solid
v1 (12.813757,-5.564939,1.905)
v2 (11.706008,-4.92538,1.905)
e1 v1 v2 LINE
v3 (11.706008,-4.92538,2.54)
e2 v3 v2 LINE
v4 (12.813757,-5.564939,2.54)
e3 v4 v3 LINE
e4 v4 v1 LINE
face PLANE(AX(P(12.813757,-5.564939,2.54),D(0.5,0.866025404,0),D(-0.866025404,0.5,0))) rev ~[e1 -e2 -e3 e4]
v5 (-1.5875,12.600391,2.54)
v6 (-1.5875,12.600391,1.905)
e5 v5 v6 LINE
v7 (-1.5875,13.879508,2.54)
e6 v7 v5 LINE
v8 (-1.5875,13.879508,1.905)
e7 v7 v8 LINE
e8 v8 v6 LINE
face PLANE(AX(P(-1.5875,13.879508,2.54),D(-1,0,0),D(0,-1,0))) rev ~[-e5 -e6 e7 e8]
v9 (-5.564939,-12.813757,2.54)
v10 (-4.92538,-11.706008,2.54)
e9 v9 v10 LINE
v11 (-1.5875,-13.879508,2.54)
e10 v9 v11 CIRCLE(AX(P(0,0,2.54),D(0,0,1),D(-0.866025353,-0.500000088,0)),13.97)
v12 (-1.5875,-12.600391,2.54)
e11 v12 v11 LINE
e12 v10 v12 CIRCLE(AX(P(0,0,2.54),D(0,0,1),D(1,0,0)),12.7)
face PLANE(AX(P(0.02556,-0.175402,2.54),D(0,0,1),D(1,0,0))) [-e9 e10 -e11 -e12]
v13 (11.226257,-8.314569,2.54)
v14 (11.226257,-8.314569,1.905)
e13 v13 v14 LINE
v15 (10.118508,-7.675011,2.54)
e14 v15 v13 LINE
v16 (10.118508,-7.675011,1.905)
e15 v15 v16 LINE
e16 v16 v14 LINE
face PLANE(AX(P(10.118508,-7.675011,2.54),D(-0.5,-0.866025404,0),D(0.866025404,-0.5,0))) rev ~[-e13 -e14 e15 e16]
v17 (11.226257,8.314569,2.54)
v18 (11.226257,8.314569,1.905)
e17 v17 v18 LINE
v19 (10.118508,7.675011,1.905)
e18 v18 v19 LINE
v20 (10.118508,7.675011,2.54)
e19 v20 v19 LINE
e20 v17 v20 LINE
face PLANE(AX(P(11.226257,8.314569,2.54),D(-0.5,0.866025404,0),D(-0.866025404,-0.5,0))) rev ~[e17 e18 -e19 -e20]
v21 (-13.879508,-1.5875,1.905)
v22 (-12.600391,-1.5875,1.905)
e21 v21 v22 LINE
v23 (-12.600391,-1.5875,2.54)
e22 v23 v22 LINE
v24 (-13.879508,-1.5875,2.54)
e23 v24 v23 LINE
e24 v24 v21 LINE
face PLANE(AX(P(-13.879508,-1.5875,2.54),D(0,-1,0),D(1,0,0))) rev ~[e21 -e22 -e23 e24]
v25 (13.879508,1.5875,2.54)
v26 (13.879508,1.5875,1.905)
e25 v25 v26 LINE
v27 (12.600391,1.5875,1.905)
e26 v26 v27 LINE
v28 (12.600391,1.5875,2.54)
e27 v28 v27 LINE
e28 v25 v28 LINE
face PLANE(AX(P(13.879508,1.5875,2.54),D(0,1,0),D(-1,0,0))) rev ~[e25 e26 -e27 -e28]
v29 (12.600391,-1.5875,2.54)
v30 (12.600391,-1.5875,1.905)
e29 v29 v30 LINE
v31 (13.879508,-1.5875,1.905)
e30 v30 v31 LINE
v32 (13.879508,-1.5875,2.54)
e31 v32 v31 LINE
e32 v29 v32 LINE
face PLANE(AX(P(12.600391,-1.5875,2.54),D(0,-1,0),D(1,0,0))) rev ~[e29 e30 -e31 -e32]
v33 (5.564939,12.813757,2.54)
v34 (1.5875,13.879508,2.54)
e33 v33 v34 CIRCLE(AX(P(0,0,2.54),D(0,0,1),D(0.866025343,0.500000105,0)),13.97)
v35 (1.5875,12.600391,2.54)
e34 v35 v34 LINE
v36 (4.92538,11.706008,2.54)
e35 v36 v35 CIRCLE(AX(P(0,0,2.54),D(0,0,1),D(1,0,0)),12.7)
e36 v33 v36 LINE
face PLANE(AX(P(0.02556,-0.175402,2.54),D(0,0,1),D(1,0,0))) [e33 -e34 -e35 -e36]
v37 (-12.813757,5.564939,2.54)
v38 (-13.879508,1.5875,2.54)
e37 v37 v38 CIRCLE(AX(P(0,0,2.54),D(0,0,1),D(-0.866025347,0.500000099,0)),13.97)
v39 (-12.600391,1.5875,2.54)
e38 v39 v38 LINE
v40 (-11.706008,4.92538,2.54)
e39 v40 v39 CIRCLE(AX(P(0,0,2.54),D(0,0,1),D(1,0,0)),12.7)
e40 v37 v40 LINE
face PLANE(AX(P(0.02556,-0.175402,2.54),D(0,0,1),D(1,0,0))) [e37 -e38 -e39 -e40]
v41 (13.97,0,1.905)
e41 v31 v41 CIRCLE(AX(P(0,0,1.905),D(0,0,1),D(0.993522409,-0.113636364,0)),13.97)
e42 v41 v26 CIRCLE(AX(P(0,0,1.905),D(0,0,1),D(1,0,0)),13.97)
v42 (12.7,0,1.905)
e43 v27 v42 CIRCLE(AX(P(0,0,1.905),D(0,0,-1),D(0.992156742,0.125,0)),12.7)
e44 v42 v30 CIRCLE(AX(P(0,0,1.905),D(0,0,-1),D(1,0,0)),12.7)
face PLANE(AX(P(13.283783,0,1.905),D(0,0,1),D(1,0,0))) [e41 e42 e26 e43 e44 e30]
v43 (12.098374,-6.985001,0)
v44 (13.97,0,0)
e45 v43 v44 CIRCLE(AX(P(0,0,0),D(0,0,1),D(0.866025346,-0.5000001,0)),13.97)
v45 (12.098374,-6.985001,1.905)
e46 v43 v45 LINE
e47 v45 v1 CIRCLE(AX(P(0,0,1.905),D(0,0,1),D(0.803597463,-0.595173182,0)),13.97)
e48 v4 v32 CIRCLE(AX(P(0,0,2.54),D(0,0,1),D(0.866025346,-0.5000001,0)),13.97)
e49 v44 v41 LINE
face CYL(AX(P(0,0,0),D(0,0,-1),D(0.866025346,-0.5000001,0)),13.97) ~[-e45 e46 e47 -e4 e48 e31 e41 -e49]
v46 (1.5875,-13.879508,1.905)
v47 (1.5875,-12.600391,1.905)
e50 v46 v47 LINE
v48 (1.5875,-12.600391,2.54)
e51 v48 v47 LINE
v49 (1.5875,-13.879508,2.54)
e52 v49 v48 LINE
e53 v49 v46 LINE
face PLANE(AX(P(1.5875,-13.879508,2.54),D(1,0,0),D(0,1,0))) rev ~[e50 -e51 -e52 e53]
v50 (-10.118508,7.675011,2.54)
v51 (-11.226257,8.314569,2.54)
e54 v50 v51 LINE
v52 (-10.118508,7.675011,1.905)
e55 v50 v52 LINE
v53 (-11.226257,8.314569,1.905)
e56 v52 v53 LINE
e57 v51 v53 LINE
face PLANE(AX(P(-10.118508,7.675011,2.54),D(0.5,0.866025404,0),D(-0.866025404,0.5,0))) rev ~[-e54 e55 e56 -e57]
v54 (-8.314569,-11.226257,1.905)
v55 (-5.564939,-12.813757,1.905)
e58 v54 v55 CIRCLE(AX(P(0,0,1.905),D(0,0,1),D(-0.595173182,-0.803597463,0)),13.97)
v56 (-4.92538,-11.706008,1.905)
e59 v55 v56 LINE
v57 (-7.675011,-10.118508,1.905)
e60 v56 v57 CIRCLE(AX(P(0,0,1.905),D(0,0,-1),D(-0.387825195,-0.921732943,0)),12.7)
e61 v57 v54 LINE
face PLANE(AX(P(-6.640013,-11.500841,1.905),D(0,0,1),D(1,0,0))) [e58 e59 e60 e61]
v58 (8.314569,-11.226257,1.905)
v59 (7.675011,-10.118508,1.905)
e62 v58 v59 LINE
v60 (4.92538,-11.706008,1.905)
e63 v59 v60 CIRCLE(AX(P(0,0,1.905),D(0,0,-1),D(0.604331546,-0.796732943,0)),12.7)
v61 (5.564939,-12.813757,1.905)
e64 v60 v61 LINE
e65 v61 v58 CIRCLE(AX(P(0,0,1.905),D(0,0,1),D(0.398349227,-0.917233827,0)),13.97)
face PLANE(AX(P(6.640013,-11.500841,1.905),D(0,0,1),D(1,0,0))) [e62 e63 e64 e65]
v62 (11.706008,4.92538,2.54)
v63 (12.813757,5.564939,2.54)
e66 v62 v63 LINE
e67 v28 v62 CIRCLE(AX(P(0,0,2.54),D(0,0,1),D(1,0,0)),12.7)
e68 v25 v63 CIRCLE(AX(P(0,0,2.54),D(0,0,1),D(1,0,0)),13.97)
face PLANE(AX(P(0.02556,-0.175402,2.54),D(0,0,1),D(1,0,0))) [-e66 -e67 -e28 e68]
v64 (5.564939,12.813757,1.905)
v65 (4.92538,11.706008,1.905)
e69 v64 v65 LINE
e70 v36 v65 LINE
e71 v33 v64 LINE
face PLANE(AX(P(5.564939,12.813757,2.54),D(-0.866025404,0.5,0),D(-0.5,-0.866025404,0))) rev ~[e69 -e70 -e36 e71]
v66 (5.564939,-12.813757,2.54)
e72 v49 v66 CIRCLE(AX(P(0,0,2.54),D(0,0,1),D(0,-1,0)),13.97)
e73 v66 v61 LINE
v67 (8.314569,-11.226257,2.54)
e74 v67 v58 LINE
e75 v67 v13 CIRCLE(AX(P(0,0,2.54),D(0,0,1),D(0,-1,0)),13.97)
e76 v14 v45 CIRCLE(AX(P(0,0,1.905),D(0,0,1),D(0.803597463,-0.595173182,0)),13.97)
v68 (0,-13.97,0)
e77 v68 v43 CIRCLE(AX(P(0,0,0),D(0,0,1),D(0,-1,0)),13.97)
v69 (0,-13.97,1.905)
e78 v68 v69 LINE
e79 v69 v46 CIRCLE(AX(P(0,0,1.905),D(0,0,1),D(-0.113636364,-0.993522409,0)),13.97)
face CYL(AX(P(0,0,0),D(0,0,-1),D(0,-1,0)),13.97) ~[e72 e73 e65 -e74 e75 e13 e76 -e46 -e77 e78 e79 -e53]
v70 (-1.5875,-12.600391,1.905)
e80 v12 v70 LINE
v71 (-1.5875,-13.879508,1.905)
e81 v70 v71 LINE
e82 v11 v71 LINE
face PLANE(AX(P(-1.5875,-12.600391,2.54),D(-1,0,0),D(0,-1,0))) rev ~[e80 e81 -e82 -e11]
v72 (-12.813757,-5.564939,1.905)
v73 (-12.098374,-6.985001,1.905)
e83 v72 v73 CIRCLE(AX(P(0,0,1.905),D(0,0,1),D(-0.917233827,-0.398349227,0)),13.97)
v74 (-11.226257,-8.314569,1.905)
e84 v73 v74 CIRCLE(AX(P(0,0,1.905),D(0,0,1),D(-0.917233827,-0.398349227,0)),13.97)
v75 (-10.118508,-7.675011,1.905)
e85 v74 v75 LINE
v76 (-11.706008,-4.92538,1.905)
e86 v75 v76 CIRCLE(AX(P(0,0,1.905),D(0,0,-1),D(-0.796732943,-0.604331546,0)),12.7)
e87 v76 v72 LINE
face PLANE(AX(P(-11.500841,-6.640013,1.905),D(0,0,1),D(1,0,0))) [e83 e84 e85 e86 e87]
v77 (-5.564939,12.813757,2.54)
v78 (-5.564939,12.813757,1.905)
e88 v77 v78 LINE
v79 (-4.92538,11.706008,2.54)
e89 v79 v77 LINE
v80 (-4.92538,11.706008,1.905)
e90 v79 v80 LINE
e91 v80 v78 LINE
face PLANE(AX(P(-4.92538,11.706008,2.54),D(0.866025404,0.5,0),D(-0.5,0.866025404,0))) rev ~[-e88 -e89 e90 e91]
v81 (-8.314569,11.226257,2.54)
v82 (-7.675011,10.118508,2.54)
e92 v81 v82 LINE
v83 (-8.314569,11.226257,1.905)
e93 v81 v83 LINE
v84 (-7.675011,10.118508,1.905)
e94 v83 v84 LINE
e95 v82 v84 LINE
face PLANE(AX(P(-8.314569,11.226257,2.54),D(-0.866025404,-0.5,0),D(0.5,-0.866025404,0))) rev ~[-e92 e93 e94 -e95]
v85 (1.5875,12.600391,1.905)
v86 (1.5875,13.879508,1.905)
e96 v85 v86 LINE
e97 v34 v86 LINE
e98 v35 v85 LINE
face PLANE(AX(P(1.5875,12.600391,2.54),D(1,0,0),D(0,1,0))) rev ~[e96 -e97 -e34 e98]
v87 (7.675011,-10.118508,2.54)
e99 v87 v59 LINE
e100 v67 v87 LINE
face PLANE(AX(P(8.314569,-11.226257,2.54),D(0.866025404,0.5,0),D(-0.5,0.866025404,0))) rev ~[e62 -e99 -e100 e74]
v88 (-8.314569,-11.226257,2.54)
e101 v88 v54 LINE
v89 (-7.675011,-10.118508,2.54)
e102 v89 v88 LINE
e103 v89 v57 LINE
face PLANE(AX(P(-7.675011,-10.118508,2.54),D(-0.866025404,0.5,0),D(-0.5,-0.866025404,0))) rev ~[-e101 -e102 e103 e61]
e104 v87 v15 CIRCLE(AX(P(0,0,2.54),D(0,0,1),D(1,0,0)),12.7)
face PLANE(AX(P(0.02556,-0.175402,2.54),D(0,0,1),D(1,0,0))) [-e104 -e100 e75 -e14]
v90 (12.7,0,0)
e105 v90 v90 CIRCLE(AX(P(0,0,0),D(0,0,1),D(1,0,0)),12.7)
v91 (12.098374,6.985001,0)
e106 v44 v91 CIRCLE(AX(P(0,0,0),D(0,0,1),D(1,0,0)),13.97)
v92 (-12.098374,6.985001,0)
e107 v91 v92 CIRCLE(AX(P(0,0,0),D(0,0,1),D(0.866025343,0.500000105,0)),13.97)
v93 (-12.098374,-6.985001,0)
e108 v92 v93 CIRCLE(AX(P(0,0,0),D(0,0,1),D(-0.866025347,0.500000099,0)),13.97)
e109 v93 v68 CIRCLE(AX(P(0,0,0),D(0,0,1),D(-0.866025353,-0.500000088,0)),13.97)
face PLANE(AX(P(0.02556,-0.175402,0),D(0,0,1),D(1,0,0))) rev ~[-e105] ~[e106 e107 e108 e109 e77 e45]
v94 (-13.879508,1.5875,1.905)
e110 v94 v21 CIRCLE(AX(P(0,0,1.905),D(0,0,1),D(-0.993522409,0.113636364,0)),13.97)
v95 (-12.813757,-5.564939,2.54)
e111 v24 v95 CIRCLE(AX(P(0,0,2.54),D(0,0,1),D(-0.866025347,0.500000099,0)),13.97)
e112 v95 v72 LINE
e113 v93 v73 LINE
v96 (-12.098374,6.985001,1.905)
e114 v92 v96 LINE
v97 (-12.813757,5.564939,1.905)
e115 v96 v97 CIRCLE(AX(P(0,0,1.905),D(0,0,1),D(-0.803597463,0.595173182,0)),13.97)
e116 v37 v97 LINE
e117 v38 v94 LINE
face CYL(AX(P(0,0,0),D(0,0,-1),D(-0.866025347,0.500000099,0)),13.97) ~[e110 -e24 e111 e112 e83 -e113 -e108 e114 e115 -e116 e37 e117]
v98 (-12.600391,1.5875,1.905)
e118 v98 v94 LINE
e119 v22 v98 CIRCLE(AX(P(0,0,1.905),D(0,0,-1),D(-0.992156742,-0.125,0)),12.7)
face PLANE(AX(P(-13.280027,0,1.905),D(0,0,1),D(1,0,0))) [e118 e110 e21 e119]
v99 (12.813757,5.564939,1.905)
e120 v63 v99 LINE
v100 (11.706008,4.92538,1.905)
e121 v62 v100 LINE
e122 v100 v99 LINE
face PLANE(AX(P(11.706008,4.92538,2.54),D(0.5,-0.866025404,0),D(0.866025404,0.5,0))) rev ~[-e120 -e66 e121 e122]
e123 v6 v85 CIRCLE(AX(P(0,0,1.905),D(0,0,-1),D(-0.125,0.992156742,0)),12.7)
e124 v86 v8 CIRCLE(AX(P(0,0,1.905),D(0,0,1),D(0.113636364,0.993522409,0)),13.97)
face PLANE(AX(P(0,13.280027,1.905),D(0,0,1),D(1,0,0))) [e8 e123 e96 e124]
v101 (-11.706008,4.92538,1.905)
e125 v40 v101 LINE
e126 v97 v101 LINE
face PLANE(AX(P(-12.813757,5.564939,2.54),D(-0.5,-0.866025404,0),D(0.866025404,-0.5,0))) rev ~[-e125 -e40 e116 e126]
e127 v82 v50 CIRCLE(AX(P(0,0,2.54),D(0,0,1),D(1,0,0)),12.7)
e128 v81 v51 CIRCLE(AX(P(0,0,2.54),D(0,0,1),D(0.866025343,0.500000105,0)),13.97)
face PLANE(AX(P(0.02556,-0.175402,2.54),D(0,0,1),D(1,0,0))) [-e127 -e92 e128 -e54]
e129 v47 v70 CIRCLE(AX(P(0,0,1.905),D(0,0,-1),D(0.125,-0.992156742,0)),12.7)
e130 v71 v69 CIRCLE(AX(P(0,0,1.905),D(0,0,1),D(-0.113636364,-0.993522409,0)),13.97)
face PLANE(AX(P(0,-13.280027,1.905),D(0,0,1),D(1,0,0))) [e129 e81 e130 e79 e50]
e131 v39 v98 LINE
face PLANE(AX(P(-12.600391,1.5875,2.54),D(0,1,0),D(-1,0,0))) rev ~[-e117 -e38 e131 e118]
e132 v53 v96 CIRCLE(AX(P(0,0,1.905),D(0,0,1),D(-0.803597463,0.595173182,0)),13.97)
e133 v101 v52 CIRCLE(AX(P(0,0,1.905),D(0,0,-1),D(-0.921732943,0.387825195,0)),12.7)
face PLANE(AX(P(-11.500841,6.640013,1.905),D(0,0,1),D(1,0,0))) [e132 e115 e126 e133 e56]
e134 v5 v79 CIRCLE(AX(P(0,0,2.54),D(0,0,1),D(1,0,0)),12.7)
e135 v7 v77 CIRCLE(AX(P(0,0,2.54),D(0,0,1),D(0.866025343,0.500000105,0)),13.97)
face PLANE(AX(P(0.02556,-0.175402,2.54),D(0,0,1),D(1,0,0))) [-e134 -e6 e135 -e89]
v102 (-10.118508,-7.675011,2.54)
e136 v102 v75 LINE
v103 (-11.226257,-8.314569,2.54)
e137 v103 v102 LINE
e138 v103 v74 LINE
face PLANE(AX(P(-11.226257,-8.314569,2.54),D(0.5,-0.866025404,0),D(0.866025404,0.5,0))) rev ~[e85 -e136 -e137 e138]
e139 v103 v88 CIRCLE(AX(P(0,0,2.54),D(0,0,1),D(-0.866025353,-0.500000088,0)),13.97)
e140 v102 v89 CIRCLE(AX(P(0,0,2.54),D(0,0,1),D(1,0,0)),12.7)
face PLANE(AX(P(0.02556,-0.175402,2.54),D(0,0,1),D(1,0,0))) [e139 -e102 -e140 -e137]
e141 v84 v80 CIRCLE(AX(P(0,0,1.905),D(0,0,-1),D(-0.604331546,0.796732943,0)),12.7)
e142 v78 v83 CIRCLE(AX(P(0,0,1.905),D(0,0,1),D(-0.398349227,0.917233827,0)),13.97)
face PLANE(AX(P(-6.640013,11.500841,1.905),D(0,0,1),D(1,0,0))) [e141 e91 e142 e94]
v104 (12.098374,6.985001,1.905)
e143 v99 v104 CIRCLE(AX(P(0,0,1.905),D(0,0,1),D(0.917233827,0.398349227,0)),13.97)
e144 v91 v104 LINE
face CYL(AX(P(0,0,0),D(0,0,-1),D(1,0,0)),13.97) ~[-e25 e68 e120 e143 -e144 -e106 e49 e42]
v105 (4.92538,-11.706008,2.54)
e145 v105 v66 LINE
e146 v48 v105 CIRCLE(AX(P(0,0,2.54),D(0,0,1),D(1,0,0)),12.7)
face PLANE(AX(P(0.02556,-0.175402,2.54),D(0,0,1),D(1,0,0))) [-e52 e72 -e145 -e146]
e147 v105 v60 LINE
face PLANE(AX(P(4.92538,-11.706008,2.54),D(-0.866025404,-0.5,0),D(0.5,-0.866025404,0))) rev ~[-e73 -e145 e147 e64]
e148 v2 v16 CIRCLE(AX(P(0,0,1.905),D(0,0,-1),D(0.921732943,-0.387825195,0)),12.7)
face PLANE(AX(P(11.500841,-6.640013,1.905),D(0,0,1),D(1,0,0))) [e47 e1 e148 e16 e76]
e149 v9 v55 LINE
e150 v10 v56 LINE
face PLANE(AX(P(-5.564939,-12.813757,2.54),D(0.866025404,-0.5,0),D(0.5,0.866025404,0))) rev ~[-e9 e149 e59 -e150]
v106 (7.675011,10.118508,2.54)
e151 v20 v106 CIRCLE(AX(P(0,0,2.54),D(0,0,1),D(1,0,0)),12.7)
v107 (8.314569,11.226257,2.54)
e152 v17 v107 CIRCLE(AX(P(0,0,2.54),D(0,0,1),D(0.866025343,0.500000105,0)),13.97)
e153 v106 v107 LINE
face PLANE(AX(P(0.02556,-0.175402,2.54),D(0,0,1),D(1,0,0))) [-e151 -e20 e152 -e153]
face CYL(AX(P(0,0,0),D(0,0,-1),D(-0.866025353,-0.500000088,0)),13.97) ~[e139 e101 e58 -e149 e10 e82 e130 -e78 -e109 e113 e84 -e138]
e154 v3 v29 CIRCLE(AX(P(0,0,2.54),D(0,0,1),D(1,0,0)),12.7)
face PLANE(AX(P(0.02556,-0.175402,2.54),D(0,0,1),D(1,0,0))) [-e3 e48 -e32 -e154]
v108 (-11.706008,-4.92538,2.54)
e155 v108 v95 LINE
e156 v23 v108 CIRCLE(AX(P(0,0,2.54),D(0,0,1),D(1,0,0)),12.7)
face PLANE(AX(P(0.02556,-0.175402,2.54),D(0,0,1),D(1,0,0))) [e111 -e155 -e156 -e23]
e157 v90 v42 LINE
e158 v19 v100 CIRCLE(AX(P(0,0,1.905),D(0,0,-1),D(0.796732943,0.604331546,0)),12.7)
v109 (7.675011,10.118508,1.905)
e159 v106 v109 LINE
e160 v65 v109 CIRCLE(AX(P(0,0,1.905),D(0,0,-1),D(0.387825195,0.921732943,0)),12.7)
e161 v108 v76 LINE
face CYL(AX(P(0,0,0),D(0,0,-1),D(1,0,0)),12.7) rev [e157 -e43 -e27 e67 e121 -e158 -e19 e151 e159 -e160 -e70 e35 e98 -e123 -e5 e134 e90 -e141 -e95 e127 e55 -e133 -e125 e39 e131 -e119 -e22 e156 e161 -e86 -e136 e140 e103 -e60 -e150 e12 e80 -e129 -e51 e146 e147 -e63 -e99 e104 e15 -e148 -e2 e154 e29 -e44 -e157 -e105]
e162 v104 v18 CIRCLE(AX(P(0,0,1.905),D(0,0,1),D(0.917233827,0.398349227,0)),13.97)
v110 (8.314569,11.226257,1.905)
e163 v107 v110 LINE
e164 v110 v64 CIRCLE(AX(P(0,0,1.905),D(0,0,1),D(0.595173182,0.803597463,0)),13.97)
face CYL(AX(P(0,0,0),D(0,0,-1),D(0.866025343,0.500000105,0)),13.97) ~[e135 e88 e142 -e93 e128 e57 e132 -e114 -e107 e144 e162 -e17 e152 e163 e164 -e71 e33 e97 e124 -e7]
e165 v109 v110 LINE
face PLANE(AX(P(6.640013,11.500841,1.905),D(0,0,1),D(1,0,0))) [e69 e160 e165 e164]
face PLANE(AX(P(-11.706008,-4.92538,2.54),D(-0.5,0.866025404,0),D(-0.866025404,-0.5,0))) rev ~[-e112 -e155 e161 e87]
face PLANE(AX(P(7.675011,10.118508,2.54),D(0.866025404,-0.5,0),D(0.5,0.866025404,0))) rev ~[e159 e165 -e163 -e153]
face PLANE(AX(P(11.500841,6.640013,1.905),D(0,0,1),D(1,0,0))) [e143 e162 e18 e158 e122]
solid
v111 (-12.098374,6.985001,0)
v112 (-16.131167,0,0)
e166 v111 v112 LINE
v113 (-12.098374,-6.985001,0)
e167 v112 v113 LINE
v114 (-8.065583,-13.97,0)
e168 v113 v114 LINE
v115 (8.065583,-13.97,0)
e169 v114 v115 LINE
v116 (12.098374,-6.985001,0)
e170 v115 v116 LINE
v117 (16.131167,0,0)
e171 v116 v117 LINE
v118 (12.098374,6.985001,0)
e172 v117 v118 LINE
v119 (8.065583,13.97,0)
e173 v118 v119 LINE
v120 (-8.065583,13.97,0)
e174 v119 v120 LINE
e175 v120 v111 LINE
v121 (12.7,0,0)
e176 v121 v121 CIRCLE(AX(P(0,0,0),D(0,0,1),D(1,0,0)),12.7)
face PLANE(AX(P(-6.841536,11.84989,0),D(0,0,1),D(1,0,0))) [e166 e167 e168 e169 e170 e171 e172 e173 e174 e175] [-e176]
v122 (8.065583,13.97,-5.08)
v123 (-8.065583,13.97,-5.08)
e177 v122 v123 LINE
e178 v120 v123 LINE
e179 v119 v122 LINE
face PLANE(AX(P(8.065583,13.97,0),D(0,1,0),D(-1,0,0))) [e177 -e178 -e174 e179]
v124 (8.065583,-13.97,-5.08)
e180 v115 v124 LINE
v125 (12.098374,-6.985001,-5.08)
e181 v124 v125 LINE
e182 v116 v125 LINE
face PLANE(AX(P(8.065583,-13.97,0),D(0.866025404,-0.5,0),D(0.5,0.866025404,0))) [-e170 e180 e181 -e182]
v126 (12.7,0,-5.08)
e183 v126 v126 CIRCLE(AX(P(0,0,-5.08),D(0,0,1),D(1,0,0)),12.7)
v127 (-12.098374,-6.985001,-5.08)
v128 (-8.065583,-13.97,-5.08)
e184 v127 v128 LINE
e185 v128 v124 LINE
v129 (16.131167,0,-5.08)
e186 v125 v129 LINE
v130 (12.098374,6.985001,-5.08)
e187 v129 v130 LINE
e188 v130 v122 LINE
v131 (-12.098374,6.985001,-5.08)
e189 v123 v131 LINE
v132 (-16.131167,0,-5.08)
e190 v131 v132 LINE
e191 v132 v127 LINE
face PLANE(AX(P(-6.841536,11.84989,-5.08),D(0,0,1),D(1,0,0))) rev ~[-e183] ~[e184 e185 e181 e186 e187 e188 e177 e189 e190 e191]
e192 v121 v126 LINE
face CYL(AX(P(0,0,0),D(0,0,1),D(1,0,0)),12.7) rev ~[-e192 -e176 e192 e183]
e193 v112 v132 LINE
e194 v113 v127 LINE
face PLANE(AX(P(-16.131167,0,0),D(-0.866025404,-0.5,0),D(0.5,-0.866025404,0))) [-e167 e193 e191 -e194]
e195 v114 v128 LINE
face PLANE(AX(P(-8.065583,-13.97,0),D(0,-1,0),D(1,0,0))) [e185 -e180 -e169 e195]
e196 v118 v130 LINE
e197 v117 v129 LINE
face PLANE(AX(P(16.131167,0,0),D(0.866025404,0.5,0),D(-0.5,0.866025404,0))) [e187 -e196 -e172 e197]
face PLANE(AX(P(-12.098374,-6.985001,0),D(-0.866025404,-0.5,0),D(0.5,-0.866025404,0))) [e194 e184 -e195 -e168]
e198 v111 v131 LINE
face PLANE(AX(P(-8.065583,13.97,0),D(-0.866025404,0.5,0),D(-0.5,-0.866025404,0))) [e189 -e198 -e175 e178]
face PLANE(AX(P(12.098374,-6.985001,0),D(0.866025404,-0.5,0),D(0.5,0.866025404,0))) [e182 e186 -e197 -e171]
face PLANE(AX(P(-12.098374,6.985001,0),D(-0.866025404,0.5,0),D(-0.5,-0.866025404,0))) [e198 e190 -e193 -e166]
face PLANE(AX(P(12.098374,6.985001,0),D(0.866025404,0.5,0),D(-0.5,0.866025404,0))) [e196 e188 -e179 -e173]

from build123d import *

# Parameters (mm, degrees)
F1_R     = 12.7
F2_DEPTH = 2.54
F3_DEPTH = 5.08
F5_DEPTH = 0.635


with BuildPart() as f2:
    # F1 (on Top) → F2 (new body)
    with BuildSketch(Plane.XY):
        with BuildLine():
            ThreePointArc((12.0983740846, -6.9850013965), (13.4939835846, -3.6157028389), (13.97, 0))
            ThreePointArc((13.97, 0), (13.493983574, 3.6157028785), (12.0983740436, 6.9850014675))
            ThreePointArc((12.0983740436, 6.9850014675), (6.9849992663, 12.0983753145), (0, 13.97))
            ThreePointArc((0, 13.97), (-6.9849993112, 12.0983752885), (-12.0983740955, 6.9850013775))
            ThreePointArc((-12.0983740955, 6.9850013775), (-13.97, 8.2e-08), (-12.0983741776, -6.9850012354))
            ThreePointArc((-12.0983741776, -6.9850012354), (-6.9849993823, -12.0983752475), (0, -13.97))
            ThreePointArc((0, -13.97), (6.9849993017, -12.098375294), (12.0983740846, -6.9850013965))
        make_face()
        Circle(F1_R, mode=Mode.SUBTRACT)
    extrude(amount=F2_DEPTH)

    # F4 (on face) → F5 (cut)
    with BuildSketch(Plane.XY.offset(2.54)):
        with BuildLine():
            Line((-12.6003906189, 1.5875), (-13.8795080514, 1.5875))
            ThreePointArc((-13.8795080514, 1.5875), (-13.97, 0), (-13.8795080514, -1.5875))
            Line((-13.8795080514, -1.5875), (-12.6003906189, -1.5875))
            ThreePointArc((-12.6003906189, -1.5875), (-12.7, 0), (-12.6003906189, 1.5875))
        make_face()
        with BuildLine():
            Line((-10.1185083736, 7.675010638), (-11.2262565646, 8.3145693542))
            ThreePointArc((-11.2262565646, 8.3145693542), (-12.0983748909, 6.985), (-12.8137565646, 5.5649386972))
            Line((-12.8137565646, 5.5649386972), (-11.7060083736, 4.925379981))
            ThreePointArc((-11.7060083736, 4.925379981), (-10.9985226281, 6.35), (-10.1185083736, 7.675010638))
        make_face()
        with BuildLine():
            ThreePointArc((-5.5649386972, 12.8137565646), (-6.985, 12.0983748909), (-8.3145693542, 11.2262565646))
            Line((-8.3145693542, 11.2262565646), (-7.675010638, 10.1185083736))
            ThreePointArc((-7.675010638, 10.1185083736), (-6.35, 10.9985226281), (-4.925379981, 11.7060083736))
            Line((-4.925379981, 11.7060083736), (-5.5649386972, 12.8137565646))
        make_face()
        with BuildLine():
            ThreePointArc((1.5875, 13.8795080514), (0, 13.97), (-1.5875, 13.8795080514))
            Line((-1.5875, 13.8795080514), (-1.5875, 12.6003906189))
            ThreePointArc((-1.5875, 12.6003906189), (0, 12.7), (1.5875, 12.6003906189))
            Line((1.5875, 12.6003906189), (1.5875, 13.8795080514))
        make_face()
        with BuildLine():
            ThreePointArc((8.3145693542, 11.2262565646), (6.985, 12.0983748909), (5.5649386972, 12.8137565646))
            Line((5.5649386972, 12.8137565646), (4.925379981, 11.7060083736))
            ThreePointArc((4.925379981, 11.7060083736), (6.35, 10.9985226281), (7.675010638, 10.1185083736))
            Line((7.675010638, 10.1185083736), (8.3145693542, 11.2262565646))
        make_face()
        with BuildLine():
            ThreePointArc((13.97, 0), (13.9473586653, 0.7950385278), (13.8795080514, 1.5875))
            Line((13.8795080514, 1.5875), (12.6003906189, 1.5875))
            ThreePointArc((12.6003906189, 1.5875), (12.6750731923, 0.7953109893), (12.7, 0))
            ThreePointArc((12.7, 0), (12.6750731923, -0.7953109893), (12.6003906189, -1.5875))
            Line((12.6003906189, -1.5875), (13.8795080514, -1.5875))
            ThreePointArc((13.8795080514, -1.5875), (13.9473586653, -0.7950385278), (13.97, 0))
        make_face()
        with BuildLine():
            ThreePointArc((11.2262565646, -8.3145693542), (12.0983748909, -6.985), (12.8137565646, -5.5649386972))
            Line((12.8137565646, -5.5649386972), (11.7060083736, -4.925379981))
            ThreePointArc((11.7060083736, -4.925379981), (10.9985226281, -6.35), (10.1185083736, -7.675010638))
            Line((10.1185083736, -7.675010638), (11.2262565646, -8.3145693542))
        make_face()
        with BuildLine():
            Line((4.925379981, -11.7060083736), (5.5649386972, -12.8137565646))
            ThreePointArc((5.5649386972, -12.8137565646), (6.985, -12.0983748909), (8.3145693542, -11.2262565646))
            Line((8.3145693542, -11.2262565646), (7.675010638, -10.1185083736))
            ThreePointArc((7.675010638, -10.1185083736), (6.35, -10.9985226281), (4.925379981, -11.7060083736))
        make_face()
        with BuildLine():
            Line((-1.5875, -12.6003906189), (-1.5875, -13.8795080514))
            ThreePointArc((-1.5875, -13.8795080514), (0, -13.97), (1.5875, -13.8795080514))
            Line((1.5875, -13.8795080514), (1.5875, -12.6003906189))
            ThreePointArc((1.5875, -12.6003906189), (0, -12.7), (-1.5875, -12.6003906189))
        make_face()
        with BuildLine():
            Line((-7.675010638, -10.1185083736), (-8.3145693542, -11.2262565646))
            ThreePointArc((-8.3145693542, -11.2262565646), (-6.985, -12.0983748909), (-5.5649386972, -12.8137565646))
            Line((-5.5649386972, -12.8137565646), (-4.925379981, -11.7060083736))
            ThreePointArc((-4.925379981, -11.7060083736), (-6.35, -10.9985226281), (-7.675010638, -10.1185083736))
        make_face()
        with BuildLine():
            Line((-11.7060083736, -4.925379981), (-12.8137565646, -5.5649386972))
            ThreePointArc((-12.8137565646, -5.5649386972), (-12.0983748909, -6.985), (-11.2262565646, -8.3145693542))
            Line((-11.2262565646, -8.3145693542), (-10.1185083736, -7.675010638))
            ThreePointArc((-10.1185083736, -7.675010638), (-10.9985226281, -6.35), (-11.7060083736, -4.925379981))
        make_face()
        with BuildLine():
            ThreePointArc((12.8137565646, 5.5649386972), (12.0983748909, 6.985), (11.2262565646, 8.3145693542))
            Line((11.2262565646, 8.3145693542), (10.1185083736, 7.675010638))
            ThreePointArc((10.1185083736, 7.675010638), (10.9985226281, 6.35), (11.7060083736, 4.925379981))
            Line((11.7060083736, 4.925379981), (12.8137565646, 5.5649386972))
        make_face()
    extrude(amount=-F5_DEPTH, mode=Mode.SUBTRACT)


with BuildPart() as f3:
    # F1 (on Top) → F3 (new body)
    with BuildSketch(Plane.XY):
        with BuildLine():
            ThreePointArc((-12.0983740955, 6.9850013775), (-6.9849993112, 12.0983752885), (0, 13.97))
            Line((0, 13.97), (-8.0655832606, 13.97))
            Line((-8.0655832606, 13.97), (-12.0983740955, 6.9850013775))
        make_face()
        with BuildLine():
            ThreePointArc((-12.0983741776, -6.9850012354), (-13.97, 8.2e-08), (-12.0983740955, 6.9850013775))
            Line((-12.0983740955, 6.9850013775), (-16.1311665212, 0))
            Line((-16.1311665212, 0), (-12.0983741776, -6.9850012354))
        make_face()
        with BuildLine():
            Line((-8.0655832606, -13.97), (0, -13.97))
            ThreePointArc((0, -13.97), (-6.9849993823, -12.0983752475), (-12.0983741776, -6.9850012354))
            Line((-12.0983741776, -6.9850012354), (-8.0655832606, -13.97))
        make_face()
        with BuildLine():
            Line((8.0655832606, -13.97), (12.0983740846, -6.9850013965))
            ThreePointArc((12.0983740846, -6.9850013965), (6.9849993017, -12.098375294), (0, -13.97))
            Line((0, -13.97), (8.0655832606, -13.97))
        make_face()
        with BuildLine():
            ThreePointArc((12.0983740436, 6.9850014675), (13.493983574, 3.6157028785), (13.97, 0))
            ThreePointArc((13.97, 0), (13.4939835846, -3.6157028389), (12.0983740846, -6.9850013965))
            Line((12.0983740846, -6.9850013965), (16.1311665212, 0))
            Line((16.1311665212, 0), (12.0983740436, 6.9850014675))
        make_face()
        with BuildLine():
            ThreePointArc((0, 13.97), (6.9849992663, 12.0983753145), (12.0983740436, 6.9850014675))
            Line((12.0983740436, 6.9850014675), (8.0655832606, 13.97))
            Line((8.0655832606, 13.97), (0, 13.97))
        make_face()
        with BuildLine():
            ThreePointArc((12.0983740846, -6.9850013965), (13.4939835846, -3.6157028389), (13.97, 0))
            ThreePointArc((13.97, 0), (13.493983574, 3.6157028785), (12.0983740436, 6.9850014675))
            ThreePointArc((12.0983740436, 6.9850014675), (6.9849992663, 12.0983753145), (0, 13.97))
            ThreePointArc((0, 13.97), (-6.9849993112, 12.0983752885), (-12.0983740955, 6.9850013775))
            ThreePointArc((-12.0983740955, 6.9850013775), (-13.97, 8.2e-08), (-12.0983741776, -6.9850012354))
            ThreePointArc((-12.0983741776, -6.9850012354), (-6.9849993823, -12.0983752475), (0, -13.97))
            ThreePointArc((0, -13.97), (6.9849993017, -12.098375294), (12.0983740846, -6.9850013965))
        make_face()
        Circle(F1_R, mode=Mode.SUBTRACT)
    extrude(amount=-F3_DEPTH)


solid = Compound([f2.part, f3.part])
